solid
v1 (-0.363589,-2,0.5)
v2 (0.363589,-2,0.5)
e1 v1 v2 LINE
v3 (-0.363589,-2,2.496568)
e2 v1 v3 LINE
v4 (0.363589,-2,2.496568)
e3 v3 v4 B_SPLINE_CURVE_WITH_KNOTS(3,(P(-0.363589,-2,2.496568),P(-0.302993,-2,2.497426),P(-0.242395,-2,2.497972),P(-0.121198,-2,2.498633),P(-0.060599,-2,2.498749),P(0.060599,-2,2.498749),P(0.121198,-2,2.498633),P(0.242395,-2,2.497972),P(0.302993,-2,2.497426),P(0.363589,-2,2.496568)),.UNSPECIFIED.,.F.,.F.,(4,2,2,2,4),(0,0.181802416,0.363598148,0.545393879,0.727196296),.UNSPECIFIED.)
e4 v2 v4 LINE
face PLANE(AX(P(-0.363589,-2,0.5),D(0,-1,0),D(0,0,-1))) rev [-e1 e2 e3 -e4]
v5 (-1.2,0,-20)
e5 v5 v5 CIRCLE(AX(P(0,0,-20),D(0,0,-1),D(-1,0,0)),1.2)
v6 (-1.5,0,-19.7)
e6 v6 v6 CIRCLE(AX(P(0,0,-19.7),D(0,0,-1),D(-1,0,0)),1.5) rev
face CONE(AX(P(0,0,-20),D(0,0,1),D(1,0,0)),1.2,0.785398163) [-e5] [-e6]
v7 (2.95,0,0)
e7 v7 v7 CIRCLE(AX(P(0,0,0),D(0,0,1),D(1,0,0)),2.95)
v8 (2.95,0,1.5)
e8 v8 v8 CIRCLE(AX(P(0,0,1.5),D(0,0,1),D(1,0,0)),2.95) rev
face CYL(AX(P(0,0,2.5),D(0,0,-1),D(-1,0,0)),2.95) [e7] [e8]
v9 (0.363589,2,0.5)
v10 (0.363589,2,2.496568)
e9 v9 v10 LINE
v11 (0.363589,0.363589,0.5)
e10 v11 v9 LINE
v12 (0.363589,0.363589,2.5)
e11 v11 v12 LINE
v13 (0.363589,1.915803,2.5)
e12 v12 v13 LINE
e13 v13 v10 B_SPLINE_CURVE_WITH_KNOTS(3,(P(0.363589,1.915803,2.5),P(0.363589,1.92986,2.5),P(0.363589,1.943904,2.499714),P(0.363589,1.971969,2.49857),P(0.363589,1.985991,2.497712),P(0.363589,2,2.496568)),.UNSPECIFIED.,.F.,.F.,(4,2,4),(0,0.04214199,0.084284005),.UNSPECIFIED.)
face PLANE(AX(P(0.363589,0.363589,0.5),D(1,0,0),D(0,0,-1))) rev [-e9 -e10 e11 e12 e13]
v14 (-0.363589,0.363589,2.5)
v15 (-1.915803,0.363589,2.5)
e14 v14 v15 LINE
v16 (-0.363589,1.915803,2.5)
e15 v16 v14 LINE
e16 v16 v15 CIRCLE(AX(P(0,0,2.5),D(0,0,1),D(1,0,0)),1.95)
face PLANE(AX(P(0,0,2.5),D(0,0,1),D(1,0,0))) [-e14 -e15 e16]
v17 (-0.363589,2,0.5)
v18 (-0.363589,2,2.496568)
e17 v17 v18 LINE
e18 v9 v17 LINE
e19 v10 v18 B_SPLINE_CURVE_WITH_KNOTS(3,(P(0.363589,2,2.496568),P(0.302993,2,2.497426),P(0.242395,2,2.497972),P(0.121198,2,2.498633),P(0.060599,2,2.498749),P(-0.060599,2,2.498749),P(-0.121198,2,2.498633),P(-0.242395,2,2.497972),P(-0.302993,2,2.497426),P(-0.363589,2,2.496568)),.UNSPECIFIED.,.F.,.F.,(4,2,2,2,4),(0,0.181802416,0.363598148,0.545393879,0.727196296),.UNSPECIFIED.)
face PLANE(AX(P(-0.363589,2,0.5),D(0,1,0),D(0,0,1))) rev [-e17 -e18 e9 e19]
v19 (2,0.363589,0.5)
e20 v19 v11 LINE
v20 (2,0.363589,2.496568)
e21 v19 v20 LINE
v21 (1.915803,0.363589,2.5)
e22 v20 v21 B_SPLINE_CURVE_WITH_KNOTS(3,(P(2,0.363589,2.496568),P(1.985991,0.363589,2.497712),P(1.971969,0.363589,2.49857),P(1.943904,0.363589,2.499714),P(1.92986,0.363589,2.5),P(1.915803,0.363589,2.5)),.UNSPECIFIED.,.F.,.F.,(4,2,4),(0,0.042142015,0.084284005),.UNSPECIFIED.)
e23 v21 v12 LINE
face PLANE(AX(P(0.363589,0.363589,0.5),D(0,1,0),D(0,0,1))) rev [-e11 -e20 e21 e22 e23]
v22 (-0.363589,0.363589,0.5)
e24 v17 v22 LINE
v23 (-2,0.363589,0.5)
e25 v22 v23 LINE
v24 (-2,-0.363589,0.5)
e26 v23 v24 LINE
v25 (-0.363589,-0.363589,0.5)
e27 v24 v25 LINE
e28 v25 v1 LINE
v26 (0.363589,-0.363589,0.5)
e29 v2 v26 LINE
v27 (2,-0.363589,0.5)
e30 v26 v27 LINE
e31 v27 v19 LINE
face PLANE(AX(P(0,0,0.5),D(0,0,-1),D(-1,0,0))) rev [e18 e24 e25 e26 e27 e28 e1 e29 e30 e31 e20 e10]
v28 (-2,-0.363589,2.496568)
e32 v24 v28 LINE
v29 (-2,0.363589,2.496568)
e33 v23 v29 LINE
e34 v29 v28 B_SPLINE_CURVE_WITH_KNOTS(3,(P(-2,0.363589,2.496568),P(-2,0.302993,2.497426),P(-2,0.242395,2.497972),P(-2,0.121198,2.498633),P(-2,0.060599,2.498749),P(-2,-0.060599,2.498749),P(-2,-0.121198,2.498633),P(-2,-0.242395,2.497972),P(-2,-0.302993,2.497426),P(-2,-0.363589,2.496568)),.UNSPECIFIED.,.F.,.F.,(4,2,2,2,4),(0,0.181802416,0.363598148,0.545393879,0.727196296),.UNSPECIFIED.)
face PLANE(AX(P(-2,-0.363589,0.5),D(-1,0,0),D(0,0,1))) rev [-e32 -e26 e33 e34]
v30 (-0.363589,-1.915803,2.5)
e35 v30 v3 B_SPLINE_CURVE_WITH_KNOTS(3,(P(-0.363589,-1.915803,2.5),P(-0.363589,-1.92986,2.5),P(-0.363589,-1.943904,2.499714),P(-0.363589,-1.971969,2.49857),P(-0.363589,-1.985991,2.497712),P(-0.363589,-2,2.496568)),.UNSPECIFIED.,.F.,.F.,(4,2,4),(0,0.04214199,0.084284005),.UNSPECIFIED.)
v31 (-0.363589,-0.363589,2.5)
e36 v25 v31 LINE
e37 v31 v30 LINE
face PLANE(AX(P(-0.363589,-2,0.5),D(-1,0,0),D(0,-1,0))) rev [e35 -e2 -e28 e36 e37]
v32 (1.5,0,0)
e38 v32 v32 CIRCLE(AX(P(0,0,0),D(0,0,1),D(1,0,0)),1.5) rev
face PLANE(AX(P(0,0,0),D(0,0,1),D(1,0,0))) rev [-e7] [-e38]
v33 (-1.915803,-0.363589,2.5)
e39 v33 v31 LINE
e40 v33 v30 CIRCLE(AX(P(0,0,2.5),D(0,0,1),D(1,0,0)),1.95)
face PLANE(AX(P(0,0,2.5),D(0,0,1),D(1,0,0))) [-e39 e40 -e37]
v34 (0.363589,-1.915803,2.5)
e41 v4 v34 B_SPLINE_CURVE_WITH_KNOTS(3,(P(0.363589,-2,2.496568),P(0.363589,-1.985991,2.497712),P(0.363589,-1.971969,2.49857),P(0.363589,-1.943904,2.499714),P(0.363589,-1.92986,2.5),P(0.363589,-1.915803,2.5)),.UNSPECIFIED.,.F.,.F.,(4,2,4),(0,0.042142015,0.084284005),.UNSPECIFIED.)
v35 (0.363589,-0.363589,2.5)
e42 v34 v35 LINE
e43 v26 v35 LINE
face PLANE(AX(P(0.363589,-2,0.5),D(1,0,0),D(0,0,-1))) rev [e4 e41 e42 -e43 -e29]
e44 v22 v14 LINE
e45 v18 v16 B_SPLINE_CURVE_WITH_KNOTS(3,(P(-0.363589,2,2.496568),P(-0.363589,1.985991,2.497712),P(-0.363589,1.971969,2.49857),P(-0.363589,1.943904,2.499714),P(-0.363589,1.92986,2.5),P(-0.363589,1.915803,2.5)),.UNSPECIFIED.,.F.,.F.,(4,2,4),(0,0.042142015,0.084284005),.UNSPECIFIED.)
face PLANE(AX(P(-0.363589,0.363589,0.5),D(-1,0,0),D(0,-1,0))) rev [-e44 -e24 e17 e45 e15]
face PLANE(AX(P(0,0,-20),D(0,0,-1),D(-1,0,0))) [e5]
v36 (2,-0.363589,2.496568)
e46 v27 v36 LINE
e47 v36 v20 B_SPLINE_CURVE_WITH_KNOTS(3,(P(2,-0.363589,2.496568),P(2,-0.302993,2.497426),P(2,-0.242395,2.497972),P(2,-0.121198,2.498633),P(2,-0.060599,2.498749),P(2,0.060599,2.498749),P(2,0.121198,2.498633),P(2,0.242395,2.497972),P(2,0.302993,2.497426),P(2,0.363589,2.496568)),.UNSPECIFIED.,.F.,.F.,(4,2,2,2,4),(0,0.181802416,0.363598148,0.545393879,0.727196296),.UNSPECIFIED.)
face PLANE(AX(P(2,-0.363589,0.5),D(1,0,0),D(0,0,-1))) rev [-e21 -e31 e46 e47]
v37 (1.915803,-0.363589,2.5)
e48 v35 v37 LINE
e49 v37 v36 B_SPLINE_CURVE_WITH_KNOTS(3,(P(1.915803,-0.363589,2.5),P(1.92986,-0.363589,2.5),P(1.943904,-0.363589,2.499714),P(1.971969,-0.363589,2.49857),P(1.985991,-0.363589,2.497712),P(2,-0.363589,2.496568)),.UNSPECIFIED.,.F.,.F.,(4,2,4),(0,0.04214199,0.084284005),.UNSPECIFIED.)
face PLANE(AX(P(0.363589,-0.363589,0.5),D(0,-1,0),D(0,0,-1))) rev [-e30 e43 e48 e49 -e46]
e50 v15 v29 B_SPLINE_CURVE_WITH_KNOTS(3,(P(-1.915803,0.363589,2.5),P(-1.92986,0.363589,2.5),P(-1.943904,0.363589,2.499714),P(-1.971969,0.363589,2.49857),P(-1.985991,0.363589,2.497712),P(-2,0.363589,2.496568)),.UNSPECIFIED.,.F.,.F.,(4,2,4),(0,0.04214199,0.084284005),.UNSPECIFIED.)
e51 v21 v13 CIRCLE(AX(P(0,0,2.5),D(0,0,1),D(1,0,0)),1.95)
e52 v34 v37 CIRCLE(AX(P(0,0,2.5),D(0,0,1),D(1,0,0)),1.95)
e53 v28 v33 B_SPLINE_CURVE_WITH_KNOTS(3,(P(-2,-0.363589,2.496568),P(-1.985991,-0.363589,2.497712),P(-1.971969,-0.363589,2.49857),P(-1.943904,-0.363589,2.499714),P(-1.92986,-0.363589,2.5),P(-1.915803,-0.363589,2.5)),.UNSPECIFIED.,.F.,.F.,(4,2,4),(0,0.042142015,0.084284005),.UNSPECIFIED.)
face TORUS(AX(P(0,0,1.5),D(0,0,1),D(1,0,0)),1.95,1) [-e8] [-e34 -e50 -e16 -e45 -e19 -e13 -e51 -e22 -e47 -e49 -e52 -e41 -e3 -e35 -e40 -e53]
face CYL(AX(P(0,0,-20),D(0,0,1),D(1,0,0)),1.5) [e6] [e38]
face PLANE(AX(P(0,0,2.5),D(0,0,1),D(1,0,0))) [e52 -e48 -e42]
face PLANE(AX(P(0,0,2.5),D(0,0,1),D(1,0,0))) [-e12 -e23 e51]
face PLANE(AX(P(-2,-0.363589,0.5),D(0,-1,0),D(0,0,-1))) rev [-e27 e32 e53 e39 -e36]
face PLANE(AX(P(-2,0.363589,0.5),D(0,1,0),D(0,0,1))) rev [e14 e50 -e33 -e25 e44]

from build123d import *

# Parameters (mm, degrees)
SKETCH1_R           = 2.95
BOSS_EXTRUDE1_DEPTH = 2.5
SKETCH2_R           = 1.5
BOSS_EXTRUDE2_DEPTH = 20
CHAMFER1_SIZE       = 0.3
CUT_EXTRUDE1_DEPTH  = 2
FILLET1_R           = 1


with BuildPart() as part:
    # Sketch1 → Boss-Extrude1 (new body)
    with BuildSketch(Plane.XY):
        Circle(SKETCH1_R)
    extrude(amount=BOSS_EXTRUDE1_DEPTH)

    # Sketch2 → Boss-Extrude2 (add)
    with BuildSketch(Plane(origin=(0, 0, 0), x_dir=(-1, 0, 0), z_dir=(0, 0, -1))):
        with Locations(Location((0, 0, 0), (0, 0, 180))):
            Circle(SKETCH2_R)
    extrude(amount=BOSS_EXTRUDE2_DEPTH)

    # Chamfer1
    chamfer1_edges = [part.edges().sort_by_distance(p)[0] for p in [
        (-1.5, 0, -20),
    ]]
    chamfer(chamfer1_edges, length=CHAMFER1_SIZE)

    # Sketch3 → Cut-Extrude1 (cut)
    with BuildSketch(Plane.XY.offset(2.5)):
        Polygon((0.363589324, 0.363589324), (2, 0.363589324), (2, -0.363589324), (0.363589324, -0.363589324), (0.363589324, -2), (-0.363589324, -2), (-0.363589324, -0.363589324), (-2, -0.363589324), (-2, 0.363589324), (-0.363589324, 0.363589324), (-0.363589324, 2), (0.363589324, 2), align=None)
    extrude(amount=-CUT_EXTRUDE1_DEPTH, mode=Mode.SUBTRACT)

    # Fillet1
    # the kernel refuses this fillet: 1 mm, written as the material it takes off along each edge
    with BuildSketch(Plane(origin=(0, 0, 2.5), x_dir=(1, 0, 0), z_dir=(0, -1, 0))) as fillet1_piece_1:
        with BuildLine():
            CenterArc((2.95 - FILLET1_R, -FILLET1_R), FILLET1_R, 0, 90)
            Line((2.95 - FILLET1_R, 0), (2.95, 0))
            Line((2.95, 0), (2.95, -FILLET1_R))
        make_face()
    revolve(axis=Axis((0, 0, 2.5), (0, 0, 1)), mode=Mode.SUBTRACT)


solid = part.part
